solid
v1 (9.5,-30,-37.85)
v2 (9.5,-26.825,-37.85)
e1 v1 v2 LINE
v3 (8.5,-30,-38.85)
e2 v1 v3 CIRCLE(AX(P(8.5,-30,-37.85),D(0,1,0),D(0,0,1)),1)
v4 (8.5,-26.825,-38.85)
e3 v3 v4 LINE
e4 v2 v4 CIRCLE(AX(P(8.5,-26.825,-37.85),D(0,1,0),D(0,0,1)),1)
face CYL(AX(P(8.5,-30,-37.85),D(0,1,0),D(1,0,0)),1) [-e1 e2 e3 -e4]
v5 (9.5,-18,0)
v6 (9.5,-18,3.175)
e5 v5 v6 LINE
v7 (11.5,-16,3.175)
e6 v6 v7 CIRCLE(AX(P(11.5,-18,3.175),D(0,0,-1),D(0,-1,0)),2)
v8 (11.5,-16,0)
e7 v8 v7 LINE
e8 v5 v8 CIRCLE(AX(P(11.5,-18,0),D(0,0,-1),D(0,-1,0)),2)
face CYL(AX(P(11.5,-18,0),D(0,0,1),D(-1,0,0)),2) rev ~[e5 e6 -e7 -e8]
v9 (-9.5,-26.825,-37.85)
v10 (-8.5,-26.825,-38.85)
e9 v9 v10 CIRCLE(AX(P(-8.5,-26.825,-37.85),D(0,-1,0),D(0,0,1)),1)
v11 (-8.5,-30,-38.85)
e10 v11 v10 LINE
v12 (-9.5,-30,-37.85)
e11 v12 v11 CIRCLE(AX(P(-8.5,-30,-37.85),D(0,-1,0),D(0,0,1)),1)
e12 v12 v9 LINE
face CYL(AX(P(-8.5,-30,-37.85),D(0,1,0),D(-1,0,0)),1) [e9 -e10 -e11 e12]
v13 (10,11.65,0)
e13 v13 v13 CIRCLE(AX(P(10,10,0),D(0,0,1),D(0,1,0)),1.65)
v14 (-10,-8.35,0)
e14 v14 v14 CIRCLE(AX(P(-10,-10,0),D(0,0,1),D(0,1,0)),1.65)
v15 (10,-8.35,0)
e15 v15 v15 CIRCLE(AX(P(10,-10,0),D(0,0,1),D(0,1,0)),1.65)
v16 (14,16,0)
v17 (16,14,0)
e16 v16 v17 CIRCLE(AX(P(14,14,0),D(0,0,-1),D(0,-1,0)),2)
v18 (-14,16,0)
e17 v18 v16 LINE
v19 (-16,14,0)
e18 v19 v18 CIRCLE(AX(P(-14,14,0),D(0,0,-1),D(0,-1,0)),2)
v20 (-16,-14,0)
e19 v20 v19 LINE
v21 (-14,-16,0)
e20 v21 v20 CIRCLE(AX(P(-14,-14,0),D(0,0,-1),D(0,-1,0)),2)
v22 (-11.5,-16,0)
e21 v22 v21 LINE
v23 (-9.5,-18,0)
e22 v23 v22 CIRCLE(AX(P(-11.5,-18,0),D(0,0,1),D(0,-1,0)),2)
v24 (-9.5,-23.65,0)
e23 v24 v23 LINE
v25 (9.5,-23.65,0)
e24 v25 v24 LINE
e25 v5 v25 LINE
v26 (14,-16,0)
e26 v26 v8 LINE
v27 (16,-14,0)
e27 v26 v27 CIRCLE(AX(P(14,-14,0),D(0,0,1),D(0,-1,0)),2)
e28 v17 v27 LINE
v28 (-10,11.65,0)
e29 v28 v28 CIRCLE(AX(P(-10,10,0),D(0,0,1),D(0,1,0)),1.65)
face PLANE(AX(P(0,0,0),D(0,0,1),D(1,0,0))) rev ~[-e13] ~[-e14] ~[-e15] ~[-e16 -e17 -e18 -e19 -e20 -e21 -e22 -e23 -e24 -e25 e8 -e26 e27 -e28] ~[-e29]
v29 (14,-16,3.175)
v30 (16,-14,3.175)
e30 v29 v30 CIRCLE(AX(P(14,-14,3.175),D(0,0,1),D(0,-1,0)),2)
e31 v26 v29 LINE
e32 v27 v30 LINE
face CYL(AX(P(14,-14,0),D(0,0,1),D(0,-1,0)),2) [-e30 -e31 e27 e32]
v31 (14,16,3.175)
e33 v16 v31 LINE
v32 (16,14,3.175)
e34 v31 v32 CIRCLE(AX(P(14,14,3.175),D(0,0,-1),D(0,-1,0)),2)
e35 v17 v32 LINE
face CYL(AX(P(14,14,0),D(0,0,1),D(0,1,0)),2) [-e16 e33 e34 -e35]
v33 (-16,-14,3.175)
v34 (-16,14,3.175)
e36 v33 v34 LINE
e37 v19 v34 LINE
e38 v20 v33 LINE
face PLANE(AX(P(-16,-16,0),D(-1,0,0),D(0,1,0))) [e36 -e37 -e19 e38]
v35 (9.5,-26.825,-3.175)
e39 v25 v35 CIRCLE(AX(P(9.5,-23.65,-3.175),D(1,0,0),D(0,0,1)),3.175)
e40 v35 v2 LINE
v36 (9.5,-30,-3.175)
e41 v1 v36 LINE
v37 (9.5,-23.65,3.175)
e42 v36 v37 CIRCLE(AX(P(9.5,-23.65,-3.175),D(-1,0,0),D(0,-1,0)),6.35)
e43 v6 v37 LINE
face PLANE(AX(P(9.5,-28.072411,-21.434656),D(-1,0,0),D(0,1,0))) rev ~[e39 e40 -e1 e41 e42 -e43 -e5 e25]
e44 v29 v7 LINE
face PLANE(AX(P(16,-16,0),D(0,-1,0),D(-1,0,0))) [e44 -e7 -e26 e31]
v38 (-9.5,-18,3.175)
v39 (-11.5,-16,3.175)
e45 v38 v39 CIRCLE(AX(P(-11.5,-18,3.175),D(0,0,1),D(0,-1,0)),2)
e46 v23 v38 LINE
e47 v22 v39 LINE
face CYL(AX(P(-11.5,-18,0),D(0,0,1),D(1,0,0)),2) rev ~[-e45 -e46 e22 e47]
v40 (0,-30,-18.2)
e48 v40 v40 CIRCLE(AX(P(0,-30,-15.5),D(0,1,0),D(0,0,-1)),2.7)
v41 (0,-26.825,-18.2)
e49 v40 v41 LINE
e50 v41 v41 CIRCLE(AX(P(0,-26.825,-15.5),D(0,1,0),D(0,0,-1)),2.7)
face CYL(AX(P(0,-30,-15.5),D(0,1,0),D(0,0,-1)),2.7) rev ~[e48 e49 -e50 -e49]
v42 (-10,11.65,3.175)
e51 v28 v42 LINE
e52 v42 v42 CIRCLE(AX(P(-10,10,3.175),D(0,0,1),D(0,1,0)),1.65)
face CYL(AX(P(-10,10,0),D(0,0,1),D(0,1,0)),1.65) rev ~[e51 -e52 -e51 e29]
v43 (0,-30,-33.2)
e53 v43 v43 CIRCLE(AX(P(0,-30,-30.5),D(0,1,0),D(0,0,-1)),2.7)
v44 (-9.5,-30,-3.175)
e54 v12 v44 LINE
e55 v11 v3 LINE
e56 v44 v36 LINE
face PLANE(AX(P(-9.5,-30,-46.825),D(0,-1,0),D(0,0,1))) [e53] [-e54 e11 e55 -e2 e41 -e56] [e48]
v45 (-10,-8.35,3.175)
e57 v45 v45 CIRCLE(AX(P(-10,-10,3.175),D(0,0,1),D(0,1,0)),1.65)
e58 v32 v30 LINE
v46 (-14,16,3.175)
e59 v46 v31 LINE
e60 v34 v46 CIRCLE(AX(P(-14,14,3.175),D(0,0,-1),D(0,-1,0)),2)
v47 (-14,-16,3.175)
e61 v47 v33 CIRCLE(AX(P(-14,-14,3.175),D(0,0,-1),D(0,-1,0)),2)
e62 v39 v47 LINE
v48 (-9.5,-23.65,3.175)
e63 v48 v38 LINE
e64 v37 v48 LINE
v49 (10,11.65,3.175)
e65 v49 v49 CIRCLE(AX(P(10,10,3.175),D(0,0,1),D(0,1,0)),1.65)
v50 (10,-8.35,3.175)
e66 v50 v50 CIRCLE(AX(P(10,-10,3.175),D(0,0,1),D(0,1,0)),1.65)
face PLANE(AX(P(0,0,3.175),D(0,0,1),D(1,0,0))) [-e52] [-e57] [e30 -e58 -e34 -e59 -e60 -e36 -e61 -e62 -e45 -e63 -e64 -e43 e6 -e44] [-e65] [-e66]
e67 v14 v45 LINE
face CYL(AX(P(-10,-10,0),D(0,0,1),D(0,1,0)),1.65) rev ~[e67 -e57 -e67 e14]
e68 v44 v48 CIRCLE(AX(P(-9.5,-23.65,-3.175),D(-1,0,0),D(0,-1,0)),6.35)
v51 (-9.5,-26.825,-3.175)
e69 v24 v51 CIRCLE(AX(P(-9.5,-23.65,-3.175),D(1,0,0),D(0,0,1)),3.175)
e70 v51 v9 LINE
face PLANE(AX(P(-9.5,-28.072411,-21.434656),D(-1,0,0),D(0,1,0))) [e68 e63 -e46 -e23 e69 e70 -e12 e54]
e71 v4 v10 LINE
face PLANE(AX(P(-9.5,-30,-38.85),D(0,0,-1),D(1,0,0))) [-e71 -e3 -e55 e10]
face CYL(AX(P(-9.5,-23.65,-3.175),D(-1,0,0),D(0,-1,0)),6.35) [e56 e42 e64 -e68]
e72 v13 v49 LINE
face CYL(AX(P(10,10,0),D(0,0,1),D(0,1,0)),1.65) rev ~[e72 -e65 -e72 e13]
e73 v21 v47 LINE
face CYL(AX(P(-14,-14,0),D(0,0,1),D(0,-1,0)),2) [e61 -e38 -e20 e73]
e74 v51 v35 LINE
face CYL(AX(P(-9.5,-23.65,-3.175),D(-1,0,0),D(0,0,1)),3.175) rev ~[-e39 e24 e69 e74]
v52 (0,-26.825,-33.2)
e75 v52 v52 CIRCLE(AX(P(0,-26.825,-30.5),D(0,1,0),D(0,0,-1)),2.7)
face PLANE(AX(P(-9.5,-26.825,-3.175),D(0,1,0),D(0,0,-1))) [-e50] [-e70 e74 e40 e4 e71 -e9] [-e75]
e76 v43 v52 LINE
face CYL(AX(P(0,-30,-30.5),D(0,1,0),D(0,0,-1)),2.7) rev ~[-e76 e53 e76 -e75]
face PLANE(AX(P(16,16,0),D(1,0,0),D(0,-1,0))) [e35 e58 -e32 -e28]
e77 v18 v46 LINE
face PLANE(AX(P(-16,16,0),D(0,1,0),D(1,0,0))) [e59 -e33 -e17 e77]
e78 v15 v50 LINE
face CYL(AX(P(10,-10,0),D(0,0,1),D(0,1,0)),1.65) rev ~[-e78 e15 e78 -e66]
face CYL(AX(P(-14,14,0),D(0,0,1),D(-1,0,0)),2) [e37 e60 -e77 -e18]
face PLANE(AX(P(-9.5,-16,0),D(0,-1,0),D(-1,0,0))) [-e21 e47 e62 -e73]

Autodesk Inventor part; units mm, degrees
ref_plane "YZ Plane" through (0, 0, 0) normal (1, 0, 0) x (0, 1, 0)
ref_plane "XZ Plane" through (0, 0, 0) normal (0, 1, 0) x (-1, 0, 0)
ref_plane "XY Plane" through (0, 0, 0) normal (0, 0, 1) x (1, 0, 0)
sketch "Sketch1" plane through (0, 0, 0) normal (0, 0, 1) x (1, 0, 0)
  line L0 (16, -16) -> (-16, -16)
  line L1 (-16, -16) -> (-16, 16)
  line L2 (-16, 16) -> (16, 16)
  line L3 (16, 16) -> (16, -16)
  line L4 (16, -16) -> (-16, 16) construction
  line L5 (-16, -16) -> (16, 16) construction
  line L6 (10, -10) -> (-10, -10) construction
  line L7 (-10, -10) -> (-10, 10) construction
  line L8 (-10, 10) -> (10, 10) construction
  line L9 (10, 10) -> (10, -10) construction
  line L10 (10, -10) -> (-10, 10) construction
  line L11 (-10, -10) -> (10, 10) construction
  line L12 (-9.5, -16) -> (9.5, -16)
  line L13 (9.5, -16) -> (9.5, -30)
  line L14 (9.5, -30) -> (-9.5, -30)
  line L15 (-9.5, -30) -> (-9.5, -16)
  point P0 (0, 0)
  point P1 (0, -16)
  dimension "d0" = 32
  dimension "d1" = 32
  dimension "d2" = 20
  dimension "d3" = 20
  dimension "d4" = 19
  dimension "d5" = 30
extrude "Plate1" add sketch "Sketch1" along normal blind 3.175
sketch "Sketch2" plane through (-9.5, -26.825, 3.175) normal (0, -1, 0) x (1, 0, 0)
  line L0 (19, 0) -> (0, 0)
  line L1 (0, 0) -> (0, -50)
  line L2 (0, -50) -> (19, -50)
  line L3 (19, -50) -> (19, 0)
edge flange "Flange1" height 50 angle 90 thickness 3.175 bend radius 3.175 thickness toward (0, -1, 0) relief tear relief width 3.175 relief depth 1.5875 edges at (0, -30, 0) wall of the first edge with corners at (9.5, -26.825, 3.175) (-9.5, -26.825, 3.175) (-9.5, -26.825, -46.825) (9.5, -26.825, -46.825)
bend "Bend1"
corner "Corner1"
fillet "Fillet1" radius 2 6 edges at (-16, -16, 1.5875) (-16, 16, 1.5875) (16, 16, 1.5875) (16, -16, 1.5875) (9.5, -16, 1.5875) (-9.5, -16, 1.5875)
hole "Hole1" at (10, -10, 0) at (10, 10, 0) at (-10, 10, 0) at (-10, -10, 0) direction (0, 0, 1) diameter 3.3 end through all
sketch "Sketch3" plane through (-9.5, -30, -46.825) normal (0, -1, 0) x (1, 0, 0)
  line L0 (1.15, 46.825) -> (-2.15, 46.825) construction
  line L1 (1.15, 46.825) -> (-2.15, 46.825) construction
  line L2 (21.15, 46.825) -> (17.85, 46.825) construction
  line L3 (21.15, 46.825) -> (17.85, 46.825) construction
  line L4 (23.5, 46.825) -> (25.5, 46.825) construction
  line L5 (21, 46.825) -> (23.5, 46.825) construction
  line L6 (19, 46.825) -> (21, 46.825) construction
  line L7 (19, 46.825) -> (0, 46.825) construction
  line L8 (-2, 46.825) -> (0, 46.825) construction
  line L9 (-4.5, 46.825) -> (-2, 46.825) construction
  line L10 (-6.5, 46.825) -> (-4.5, 46.825) construction
  line L11 (-4.5, 46.825) -> (-6.5, 46.825) construction
  line L12 (23.5, 46.825) -> (-4.5, 46.825) construction
  line L13 (25.5, 46.825) -> (23.5, 46.825) construction
  line L14 (0, 0) -> (0, 43.65) construction
  line L15 (19, 24.975) -> (0, 24.975) construction
  line L16 (0, 24.975) -> (0, 37.675) construction
  line L17 (0, 37.675) -> (19, 37.675) construction
  line L18 (19, 37.675) -> (19, 24.975) construction
  line L19 (19, 24.975) -> (0, 37.675) construction
  line L20 (0, 24.975) -> (19, 37.675) construction
  line L21 (19, 43.65) -> (19, 0) construction
  line L22 (0, 33.825) -> (19, 33.825) construction
  line L23 (19, 33.825) -> (19, 13.825) construction
  line L24 (19, 13.825) -> (0, 13.825) construction
  line L25 (0, 13.825) -> (0, 33.825) construction
  line L26 (19, 9.975) -> (0, 9.975) construction
  line L27 (0, 9.975) -> (0, 22.675) construction
  line L28 (0, 22.675) -> (19, 22.675) construction
  line L29 (19, 22.675) -> (19, 9.975) construction
  line L30 (19, 9.975) -> (0, 22.675) construction
  line L31 (0, 9.975) -> (19, 22.675) construction
  line L32 (0, 33.825) -> (19, 13.825) construction
  line L33 (0, 13.825) -> (19, 33.825) construction
  line L34 (19, 43.65) -> (0, 43.65) projected
  line L35 (0, 0) -> (0, 43.65) projected
  line L36 (19, 0) -> (0, 0) projected
  line L37 (19, 43.65) -> (19, 0) projected
  line L38 (0, 7.975) -> (19, 7.975)
  point P0 (9.5, 46.825)
  point P1 (9.5, 31.325)
  point P2 (9.5, 46.825)
  point P3 (9.5, 16.325)
  point P4 (9.5, 23.825)
  point P5 (9.5, 23.825)
  point P6 (19, 9.975)
  point P7 (0, 9.975)
  dimension "d25" = 12.7
  dimension "d27" = 20
  dimension "d28" = 13
  dimension "d29" = 7.5
  dimension "d30" = 7.5
  dimension "d33" = 2
extrude "Extrusion1" cut sketch "Sketch3" against normal through all contours L37 L36 L35 L38
fillet "Fillet2" radius 1 2 edges at (9.5, -28.4125, -38.85) (-9.5, -28.4125, -38.85)
hole "Hole2" at (0, -30, -15.5) at (0, -30, -30.5) direction (0, 1, 0) diameter 5.4 end through all
equation "\"d23\" = Thickness"
equation "\"d6\" = Thickness"
equation "\"d7\" = BendReliefWidth"
equation "\"d8\" = BendReliefDepth"
equation "\"d9\" = MinimumRemnant"
equation "\"d10\" = TransitionRadius"
equation "\"d13\" = BendRadius"
equation "\"d14\" = CornerReliefSize"
equation "\"d15\" = GapSize"
equation "\"d16\" = JacobiRadiusSize"
equation "\"d30\" = d29"
equation "\"BendReliefWidth\" = Thickness"
equation "\"BendReliefDepth\" = 0.5 * Thickness"
equation "\"CornerReliefSize\" = 4 * Thickness"
equation "\"MinimumRemnant\" = 2 * Thickness"
equation "\"TransitionRadius\" = BendRadius"
equation "\"JacobiRadiusSize\" = BendRadius"
equation "\"GapSize\" = Thickness"
equation "\"Thickness\" = 3.175"
equation "\"BendRadius\" = 3.175"
properties part number "Printhead Belt Retainer Bracket" material "Aluminum 6061"
